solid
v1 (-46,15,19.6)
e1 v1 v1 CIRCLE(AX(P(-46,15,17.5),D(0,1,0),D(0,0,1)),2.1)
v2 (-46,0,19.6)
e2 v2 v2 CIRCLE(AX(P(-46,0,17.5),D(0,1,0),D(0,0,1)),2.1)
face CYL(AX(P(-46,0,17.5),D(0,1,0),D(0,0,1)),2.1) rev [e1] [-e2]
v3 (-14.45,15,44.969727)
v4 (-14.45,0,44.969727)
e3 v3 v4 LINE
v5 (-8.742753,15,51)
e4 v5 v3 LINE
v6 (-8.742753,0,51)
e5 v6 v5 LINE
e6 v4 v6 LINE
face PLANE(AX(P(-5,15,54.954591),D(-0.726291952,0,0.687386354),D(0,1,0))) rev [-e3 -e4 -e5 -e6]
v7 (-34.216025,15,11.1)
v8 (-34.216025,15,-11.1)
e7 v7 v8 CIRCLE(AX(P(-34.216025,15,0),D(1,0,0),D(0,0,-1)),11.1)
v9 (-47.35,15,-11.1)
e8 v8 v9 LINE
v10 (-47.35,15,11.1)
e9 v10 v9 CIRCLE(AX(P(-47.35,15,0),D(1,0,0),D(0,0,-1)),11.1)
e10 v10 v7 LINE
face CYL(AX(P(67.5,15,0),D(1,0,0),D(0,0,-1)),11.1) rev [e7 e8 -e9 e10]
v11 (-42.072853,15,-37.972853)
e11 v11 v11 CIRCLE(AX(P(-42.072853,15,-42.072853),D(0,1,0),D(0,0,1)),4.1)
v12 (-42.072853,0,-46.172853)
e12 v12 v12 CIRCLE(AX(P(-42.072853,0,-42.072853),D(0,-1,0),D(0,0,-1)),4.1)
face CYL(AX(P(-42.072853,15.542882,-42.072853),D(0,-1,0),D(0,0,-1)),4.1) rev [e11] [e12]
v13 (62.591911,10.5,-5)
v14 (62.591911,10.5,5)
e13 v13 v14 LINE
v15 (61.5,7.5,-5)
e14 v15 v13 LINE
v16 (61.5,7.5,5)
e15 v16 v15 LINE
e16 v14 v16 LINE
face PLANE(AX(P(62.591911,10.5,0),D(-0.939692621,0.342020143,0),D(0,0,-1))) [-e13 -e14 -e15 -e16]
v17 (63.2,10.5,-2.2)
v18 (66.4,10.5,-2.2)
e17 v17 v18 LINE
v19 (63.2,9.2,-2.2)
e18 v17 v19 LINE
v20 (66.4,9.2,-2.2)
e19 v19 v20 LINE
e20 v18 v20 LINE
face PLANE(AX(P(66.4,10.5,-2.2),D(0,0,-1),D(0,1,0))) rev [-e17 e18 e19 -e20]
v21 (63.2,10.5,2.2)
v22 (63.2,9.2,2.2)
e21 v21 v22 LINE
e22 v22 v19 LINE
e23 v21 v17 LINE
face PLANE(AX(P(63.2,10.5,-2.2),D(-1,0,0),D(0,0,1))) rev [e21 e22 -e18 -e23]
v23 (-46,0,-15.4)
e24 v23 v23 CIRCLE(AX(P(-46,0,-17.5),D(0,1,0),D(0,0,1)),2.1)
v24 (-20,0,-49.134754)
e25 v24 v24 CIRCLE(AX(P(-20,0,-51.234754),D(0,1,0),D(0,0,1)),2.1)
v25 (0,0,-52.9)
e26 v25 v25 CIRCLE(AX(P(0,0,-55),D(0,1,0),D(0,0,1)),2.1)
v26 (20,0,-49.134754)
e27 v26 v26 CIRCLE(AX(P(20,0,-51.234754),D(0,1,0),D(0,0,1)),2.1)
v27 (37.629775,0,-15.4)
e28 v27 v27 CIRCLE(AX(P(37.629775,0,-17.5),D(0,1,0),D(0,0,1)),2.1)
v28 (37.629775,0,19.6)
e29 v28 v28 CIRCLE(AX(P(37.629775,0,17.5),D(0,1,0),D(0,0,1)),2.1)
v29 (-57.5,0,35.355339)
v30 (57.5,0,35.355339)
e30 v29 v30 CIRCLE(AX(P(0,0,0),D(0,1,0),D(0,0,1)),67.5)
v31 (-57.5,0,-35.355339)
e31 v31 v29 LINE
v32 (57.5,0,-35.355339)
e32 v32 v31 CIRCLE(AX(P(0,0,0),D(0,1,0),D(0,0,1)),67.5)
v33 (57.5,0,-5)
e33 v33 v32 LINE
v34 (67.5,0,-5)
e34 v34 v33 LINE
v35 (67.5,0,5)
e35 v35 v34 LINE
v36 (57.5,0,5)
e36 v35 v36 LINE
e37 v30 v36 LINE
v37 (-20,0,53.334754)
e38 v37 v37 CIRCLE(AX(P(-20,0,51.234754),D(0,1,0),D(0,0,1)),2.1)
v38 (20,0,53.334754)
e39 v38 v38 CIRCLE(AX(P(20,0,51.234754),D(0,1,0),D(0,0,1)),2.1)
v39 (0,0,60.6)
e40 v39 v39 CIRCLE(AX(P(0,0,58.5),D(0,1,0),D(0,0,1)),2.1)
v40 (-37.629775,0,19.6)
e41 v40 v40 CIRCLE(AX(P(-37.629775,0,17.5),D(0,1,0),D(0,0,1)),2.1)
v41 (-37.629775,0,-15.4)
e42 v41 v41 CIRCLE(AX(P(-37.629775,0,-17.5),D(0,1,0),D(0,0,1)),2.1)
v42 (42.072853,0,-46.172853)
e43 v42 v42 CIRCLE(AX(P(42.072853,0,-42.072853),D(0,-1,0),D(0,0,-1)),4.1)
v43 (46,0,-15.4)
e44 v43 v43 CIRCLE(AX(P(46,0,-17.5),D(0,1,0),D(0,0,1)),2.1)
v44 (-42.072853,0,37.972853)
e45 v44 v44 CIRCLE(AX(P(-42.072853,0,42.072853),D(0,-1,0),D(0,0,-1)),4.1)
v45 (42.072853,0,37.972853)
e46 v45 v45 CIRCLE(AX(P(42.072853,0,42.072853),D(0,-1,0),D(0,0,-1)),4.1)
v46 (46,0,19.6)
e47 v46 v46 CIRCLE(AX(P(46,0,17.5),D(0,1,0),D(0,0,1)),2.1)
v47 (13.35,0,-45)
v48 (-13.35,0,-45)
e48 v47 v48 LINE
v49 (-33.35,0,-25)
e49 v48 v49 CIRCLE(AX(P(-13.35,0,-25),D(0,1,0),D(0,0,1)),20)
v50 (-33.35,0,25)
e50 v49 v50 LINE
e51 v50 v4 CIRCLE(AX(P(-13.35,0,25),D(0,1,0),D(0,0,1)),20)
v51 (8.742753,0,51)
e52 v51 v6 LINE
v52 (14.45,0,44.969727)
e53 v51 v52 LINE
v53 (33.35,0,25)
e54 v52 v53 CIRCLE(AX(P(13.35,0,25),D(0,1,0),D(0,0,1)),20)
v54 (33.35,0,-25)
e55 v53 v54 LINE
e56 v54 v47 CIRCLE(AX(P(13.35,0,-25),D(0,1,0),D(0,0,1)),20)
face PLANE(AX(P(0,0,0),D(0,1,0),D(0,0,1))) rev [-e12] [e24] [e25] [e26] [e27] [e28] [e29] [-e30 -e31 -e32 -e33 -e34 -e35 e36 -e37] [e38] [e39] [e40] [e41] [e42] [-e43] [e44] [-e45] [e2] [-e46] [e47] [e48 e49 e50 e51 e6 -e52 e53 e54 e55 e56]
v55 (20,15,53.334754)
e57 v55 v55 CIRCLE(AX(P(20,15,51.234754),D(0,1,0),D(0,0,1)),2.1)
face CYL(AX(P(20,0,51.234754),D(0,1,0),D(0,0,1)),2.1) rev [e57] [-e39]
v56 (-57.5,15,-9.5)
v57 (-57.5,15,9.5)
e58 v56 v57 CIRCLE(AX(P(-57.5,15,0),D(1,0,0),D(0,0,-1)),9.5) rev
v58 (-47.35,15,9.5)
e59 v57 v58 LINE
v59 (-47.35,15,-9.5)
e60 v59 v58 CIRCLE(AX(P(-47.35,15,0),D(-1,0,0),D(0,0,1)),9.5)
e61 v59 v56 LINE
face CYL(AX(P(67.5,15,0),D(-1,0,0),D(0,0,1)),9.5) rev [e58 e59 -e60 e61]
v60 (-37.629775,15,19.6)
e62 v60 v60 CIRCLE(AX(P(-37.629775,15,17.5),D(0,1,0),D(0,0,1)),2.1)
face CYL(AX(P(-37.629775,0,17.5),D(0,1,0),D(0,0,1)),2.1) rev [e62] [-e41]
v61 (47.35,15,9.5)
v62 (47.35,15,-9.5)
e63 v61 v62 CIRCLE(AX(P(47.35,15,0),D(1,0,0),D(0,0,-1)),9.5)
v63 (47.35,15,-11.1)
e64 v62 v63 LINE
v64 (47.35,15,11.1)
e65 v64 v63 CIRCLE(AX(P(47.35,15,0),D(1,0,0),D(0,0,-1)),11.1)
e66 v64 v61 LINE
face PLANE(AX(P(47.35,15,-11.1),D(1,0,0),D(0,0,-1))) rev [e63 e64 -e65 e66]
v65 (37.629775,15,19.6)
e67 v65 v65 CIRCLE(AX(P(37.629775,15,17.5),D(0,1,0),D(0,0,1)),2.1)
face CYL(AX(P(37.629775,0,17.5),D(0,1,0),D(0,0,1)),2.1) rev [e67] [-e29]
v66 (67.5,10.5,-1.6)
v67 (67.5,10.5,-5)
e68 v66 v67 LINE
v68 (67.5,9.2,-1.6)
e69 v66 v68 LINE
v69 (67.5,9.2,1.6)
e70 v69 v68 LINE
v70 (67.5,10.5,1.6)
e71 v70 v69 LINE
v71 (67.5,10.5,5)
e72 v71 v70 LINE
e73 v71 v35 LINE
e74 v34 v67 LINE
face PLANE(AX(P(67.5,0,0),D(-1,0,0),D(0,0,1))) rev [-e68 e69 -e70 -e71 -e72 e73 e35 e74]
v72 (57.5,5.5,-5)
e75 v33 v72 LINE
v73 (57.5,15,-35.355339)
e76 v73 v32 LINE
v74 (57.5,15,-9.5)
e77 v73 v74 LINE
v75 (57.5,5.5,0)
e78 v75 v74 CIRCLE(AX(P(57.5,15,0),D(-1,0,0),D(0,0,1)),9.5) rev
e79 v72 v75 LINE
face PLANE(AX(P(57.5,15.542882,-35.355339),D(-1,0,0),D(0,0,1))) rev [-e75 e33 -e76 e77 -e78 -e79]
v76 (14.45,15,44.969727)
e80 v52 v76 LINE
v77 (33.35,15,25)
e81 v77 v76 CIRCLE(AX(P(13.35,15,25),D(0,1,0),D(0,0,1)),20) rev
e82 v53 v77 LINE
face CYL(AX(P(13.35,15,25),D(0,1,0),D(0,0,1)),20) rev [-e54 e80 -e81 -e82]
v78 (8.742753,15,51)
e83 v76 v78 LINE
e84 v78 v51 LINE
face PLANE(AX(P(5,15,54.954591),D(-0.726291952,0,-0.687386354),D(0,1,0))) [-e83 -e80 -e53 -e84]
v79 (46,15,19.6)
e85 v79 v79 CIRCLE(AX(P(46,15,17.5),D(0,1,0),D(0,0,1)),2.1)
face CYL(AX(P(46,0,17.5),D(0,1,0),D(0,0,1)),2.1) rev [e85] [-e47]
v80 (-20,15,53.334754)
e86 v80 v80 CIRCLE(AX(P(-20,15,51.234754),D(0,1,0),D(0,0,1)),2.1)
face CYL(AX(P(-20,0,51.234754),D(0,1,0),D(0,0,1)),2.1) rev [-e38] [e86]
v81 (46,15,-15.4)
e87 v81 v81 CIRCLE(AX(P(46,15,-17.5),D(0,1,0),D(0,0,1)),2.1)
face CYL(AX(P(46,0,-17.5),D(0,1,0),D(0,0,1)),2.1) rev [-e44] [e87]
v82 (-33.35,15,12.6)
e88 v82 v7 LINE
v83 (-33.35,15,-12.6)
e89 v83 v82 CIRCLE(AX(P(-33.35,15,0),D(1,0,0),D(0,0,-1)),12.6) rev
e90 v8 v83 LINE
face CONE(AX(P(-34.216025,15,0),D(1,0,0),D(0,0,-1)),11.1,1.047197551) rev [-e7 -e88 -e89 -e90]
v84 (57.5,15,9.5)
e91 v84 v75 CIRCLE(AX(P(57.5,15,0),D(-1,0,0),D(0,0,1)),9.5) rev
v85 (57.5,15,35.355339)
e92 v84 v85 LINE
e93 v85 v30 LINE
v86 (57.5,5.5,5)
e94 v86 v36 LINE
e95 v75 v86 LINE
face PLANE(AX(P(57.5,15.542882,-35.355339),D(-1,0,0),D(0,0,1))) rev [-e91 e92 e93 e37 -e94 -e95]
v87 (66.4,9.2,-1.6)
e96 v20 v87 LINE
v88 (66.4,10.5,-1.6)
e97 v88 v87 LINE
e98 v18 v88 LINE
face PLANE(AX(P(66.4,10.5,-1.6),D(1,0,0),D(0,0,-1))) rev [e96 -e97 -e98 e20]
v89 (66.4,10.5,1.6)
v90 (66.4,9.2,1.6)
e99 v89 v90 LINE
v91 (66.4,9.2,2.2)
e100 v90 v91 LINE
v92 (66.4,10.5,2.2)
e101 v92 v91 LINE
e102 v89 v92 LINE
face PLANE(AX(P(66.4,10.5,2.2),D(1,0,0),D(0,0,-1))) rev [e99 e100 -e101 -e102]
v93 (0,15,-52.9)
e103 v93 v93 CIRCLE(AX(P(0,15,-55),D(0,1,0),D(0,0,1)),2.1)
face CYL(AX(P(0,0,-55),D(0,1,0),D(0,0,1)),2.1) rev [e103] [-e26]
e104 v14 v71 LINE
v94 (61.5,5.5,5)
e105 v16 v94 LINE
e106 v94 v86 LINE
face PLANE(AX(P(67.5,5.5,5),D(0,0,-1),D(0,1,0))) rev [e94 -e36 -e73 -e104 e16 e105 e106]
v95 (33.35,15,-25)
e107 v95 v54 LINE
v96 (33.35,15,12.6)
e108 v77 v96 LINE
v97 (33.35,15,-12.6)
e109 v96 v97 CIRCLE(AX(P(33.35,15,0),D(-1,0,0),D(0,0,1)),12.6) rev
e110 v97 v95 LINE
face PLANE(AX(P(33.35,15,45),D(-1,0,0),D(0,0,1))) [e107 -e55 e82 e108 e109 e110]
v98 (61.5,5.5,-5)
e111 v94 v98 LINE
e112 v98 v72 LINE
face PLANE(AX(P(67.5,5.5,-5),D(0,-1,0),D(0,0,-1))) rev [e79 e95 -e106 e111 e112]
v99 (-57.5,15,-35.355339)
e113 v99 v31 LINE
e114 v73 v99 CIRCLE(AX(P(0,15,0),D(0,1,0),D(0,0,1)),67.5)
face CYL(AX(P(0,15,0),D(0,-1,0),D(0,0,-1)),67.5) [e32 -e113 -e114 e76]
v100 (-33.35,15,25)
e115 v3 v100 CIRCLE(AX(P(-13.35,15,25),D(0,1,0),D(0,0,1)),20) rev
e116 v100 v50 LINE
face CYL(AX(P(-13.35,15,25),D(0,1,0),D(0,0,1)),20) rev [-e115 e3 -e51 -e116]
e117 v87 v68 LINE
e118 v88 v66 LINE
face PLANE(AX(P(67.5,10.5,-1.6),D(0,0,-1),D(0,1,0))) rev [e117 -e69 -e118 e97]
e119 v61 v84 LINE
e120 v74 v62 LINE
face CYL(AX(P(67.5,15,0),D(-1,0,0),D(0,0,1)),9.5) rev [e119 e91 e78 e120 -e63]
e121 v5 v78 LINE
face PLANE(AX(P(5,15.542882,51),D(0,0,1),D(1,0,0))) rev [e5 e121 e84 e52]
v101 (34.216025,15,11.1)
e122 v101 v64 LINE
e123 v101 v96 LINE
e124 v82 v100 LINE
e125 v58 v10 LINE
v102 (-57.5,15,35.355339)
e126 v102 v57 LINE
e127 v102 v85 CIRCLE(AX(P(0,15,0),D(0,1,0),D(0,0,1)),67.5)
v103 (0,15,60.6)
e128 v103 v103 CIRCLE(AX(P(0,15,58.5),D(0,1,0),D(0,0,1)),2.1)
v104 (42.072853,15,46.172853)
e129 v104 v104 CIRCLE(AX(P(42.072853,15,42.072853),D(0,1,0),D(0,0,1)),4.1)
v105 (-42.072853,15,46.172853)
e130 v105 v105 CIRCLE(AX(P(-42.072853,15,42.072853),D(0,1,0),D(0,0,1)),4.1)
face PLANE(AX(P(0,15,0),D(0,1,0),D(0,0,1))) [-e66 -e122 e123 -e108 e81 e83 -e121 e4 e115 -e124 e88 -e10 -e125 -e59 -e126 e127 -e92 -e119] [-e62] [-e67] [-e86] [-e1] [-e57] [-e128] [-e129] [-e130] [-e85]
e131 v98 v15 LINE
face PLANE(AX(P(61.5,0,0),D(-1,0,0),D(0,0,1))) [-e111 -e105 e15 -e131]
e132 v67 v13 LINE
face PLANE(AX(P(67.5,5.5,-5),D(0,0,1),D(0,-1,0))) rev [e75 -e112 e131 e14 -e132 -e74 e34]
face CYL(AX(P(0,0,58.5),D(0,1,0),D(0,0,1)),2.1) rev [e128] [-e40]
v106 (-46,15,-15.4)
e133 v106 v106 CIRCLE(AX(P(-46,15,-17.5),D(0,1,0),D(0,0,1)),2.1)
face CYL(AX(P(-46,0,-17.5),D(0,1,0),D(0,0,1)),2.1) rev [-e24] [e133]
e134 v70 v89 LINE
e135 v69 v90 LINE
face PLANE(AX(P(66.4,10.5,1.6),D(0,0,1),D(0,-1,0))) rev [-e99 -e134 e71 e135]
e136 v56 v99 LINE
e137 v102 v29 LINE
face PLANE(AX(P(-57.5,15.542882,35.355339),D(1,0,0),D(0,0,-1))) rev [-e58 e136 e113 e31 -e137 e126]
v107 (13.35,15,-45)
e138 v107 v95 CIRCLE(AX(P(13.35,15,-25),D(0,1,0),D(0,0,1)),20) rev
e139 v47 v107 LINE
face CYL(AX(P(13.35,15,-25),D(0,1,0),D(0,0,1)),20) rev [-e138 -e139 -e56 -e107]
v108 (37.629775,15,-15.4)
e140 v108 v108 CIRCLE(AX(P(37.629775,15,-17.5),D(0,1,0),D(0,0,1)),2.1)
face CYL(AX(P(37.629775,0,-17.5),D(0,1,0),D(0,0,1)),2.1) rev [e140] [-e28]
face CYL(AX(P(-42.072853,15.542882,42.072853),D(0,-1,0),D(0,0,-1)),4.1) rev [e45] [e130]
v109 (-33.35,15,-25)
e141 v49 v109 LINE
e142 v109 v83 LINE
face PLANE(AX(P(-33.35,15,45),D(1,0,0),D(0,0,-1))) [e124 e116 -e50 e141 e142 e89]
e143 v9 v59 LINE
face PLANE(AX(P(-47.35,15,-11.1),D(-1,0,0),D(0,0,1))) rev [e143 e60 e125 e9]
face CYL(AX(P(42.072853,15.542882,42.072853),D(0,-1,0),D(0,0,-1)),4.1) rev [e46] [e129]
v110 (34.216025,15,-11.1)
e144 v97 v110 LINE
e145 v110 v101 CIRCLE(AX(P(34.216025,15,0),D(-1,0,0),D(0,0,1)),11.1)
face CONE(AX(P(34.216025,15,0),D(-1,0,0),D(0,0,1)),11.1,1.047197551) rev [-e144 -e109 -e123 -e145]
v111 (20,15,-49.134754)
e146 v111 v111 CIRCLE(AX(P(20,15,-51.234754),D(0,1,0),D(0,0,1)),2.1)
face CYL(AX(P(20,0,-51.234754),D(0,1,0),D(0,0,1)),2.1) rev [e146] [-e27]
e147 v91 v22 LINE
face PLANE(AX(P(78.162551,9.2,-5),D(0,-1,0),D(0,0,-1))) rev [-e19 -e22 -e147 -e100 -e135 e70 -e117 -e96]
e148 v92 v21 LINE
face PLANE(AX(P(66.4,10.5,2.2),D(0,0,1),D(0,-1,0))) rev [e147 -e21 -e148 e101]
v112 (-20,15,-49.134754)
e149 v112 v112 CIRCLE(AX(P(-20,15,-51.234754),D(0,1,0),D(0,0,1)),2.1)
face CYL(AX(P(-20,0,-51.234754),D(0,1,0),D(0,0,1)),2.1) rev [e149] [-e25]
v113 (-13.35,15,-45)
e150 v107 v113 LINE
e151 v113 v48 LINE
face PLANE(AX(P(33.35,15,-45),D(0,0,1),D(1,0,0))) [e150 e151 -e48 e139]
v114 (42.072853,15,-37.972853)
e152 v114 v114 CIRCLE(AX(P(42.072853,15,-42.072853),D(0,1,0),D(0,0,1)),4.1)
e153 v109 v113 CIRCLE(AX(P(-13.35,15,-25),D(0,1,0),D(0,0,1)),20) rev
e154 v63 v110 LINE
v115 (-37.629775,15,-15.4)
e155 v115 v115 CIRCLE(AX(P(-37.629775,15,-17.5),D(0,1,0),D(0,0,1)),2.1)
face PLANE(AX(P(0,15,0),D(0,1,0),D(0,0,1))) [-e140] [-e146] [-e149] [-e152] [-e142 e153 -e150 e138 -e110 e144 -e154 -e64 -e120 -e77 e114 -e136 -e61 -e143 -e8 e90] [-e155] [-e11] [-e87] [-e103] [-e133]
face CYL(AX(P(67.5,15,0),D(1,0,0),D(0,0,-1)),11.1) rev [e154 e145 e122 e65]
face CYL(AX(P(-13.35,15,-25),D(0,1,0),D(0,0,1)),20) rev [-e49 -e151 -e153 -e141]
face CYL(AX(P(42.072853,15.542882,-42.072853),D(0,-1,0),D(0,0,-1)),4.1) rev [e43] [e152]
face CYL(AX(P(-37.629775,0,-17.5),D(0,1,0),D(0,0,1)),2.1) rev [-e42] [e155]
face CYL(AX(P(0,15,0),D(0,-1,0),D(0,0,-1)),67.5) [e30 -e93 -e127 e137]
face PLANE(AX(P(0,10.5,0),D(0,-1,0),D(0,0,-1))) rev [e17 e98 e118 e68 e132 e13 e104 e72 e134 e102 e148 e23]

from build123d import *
from OCP.BRepFilletAPI import BRepFilletAPI_MakeChamfer

# Parameters (mm, degrees)
SKETCH2_R               = 67.5
SKETCH2_W               = 66.7
SKETCH2_H               = 90
BOSS_EXTRUDE1_DEPTH     = 15
SKETCH7_W               = 14
SKETCH7_H               = 11.1
CUT_EXTRUDE1_DEPTH      = 135.058839694
CUT_EXTRUDE1_DEPTH_BACK = 135.058839694
SKETCH8_R               = 9.5
FILLET1_R               = 20
SKETCH9_R               = 2.1
CUT_EXTRUDE2_DEPTH      = 97.630740606
CHAMFER1_SIZE           = 1.5
CHAMFER1_SIZE2          = 0.866025404
SKETCH10_R              = 4.1
CUT_EXTRUDE3_DEPTH      = 97.630740606
CUT_EXTRUDE4_DEPTH      = 97.630740606
SKETCH12_W              = 10
SKETCH12_H              = 5.5
BOSS_EXTRUDE2_DEPTH     = 10
BOSS_EXTRUDE3_START     = 4
SKETCH14_W              = 10
SKETCH14_H              = 3.7
BOSS_EXTRUDE3_DEPTH     = 6
BOSS_EXTRUDE4_DEPTH     = 1.3
CHAMFER2_SIZE           = 3
CHAMFER2_SIZE2          = 1.091910703
SKETCH16_W              = 10
SKETCH16_H              = 6
CUT_EXTRUDE5_DEPTH      = 97.630740606
CHAMFER3_START          = -1
CHAMFER3_DEPTH          = 16
CUT_EXTRUDE6_DEPTH      = 97.630740606


with BuildPart() as part:
    # Sketch2 → Boss-Extrude1 (new body)
    with BuildSketch(Plane(origin=(0, 0, 0), x_dir=(1, 0, 0), z_dir=(0, 1, 0))):
        with Locations(Location((0, 0, 0), (0, 0, 270))):
            Circle(SKETCH2_R)
        Rectangle(SKETCH2_W, SKETCH2_H, mode=Mode.SUBTRACT)
    extrude(amount=BOSS_EXTRUDE1_DEPTH)

    # Sketch7 → Cut-Revolve2 (revolve, cut)
    with BuildSketch(Plane(origin=(0, 15, 0), x_dir=(1, 0, 0), z_dir=(0, 1, 0))):
        with Locations((-40.35, 5.55)):
            Rectangle(SKETCH7_W, SKETCH7_H)
        with Locations((40.35, 5.55)):
            Rectangle(SKETCH7_W, SKETCH7_H)
    revolve(axis=Axis((67.5, 15, 0), (-1, 0, 0)), mode=Mode.SUBTRACT)

    # Sketch8 → Cut-Extrude1 (cut, two sides: drawn at the far end of the back side and taken through both)
    with BuildSketch(Plane.ZY.offset(-47.35).offset(-CUT_EXTRUDE1_DEPTH_BACK)):
        with Locations((0, 15)):
            Circle(SKETCH8_R)
    extrude(amount=CUT_EXTRUDE1_DEPTH + CUT_EXTRUDE1_DEPTH_BACK, mode=Mode.SUBTRACT)

    # Fillet1
    fillet1_edges = [part.edges().sort_by_distance(p)[0] for p in [
        (-33.35, 7.5, -45),
        (-33.35, 7.5, 45),
        (33.35, 7.5, 45),
        (33.35, 7.5, -45),
    ]]
    fillet(fillet1_edges, radius=FILLET1_R)

    # Sketch9 → Cut-Extrude2 (cut, through all)
    with BuildSketch(Plane(origin=(0, 15, 0), x_dir=(1, 0, 0), z_dir=(0, 1, 0))):
        with Locations(Location((-37.629775444, 17.5, 0), (0, 0, 270))):
            Circle(SKETCH9_R)
        with Locations(Location((37.629775444, 17.5, 0), (0, 0, 270))):
            Circle(SKETCH9_R)
        with Locations(Location((37.629775444, -17.5, 0), (0, 0, 270))):
            Circle(SKETCH9_R)
        with Locations(Location((-37.629775444, -17.5, 0), (0, 0, 270))):
            Circle(SKETCH9_R)
        with Locations(Location((-20, 51.23475383, 0), (0, 0, 270))):
            Circle(SKETCH9_R)
        with Locations(Location((20, 51.23475383, 0), (0, 0, 270))):
            Circle(SKETCH9_R)
        with Locations(Location((20, -51.23475383, 0), (0, 0, 270))):
            Circle(SKETCH9_R)
        with Locations(Location((-20, -51.23475383, 0), (0, 0, 270))):
            Circle(SKETCH9_R)
        with Locations(Location((0, 55, 0), (0, 0, 270))):
            Circle(SKETCH9_R)
        with Locations(Location((0, -58.5, 0), (0, 0, 270))):
            Circle(SKETCH9_R)
        with Locations(Location((46, 17.5, 0), (0, 0, 270))):
            Circle(SKETCH9_R)
        with Locations(Location((46, -17.5, 0), (0, 0, 270))):
            Circle(SKETCH9_R)
        with Locations(Location((-46, 17.5, 0), (0, 0, 270))):
            Circle(SKETCH9_R)
        with Locations(Location((-46, -17.5, 0), (0, 0, 270))):
            Circle(SKETCH9_R)
    extrude(amount=-CUT_EXTRUDE2_DEPTH, mode=Mode.SUBTRACT)

    # Chamfer1: one chamfer whose edges measure the first distance from different faces: ONE call of the kernel's chamfer builder (chamfer() names one face for all edges)
    chamfer1_edges_1 = [part.edges().sort_by_distance(p)[0] for p in [
        (-33.35, 3.9, 0),
    ]]
    chamfer1_side_1 = [part.faces().sort_by_distance(p)[0] for p in [
        (-33.35, 0.522015325, 0),
    ]]
    chamfer1_edges_2 = [part.edges().sort_by_distance(p)[0] for p in [
        (33.35, 3.9, 0),
    ]]
    chamfer1_side_2 = [part.faces().sort_by_distance(p)[0] for p in [
        (33.35, 0.522015325, 0),
    ]]
    chamfer1 = BRepFilletAPI_MakeChamfer(part.part.solid().wrapped)
    for e in chamfer1_edges_1:
        chamfer1.Add(CHAMFER1_SIZE, CHAMFER1_SIZE2, e.wrapped, chamfer1_side_1[0].wrapped)  # the first distance lies on this face
    for e in chamfer1_edges_2:
        chamfer1.Add(CHAMFER1_SIZE, CHAMFER1_SIZE2, e.wrapped, chamfer1_side_2[0].wrapped)  # the first distance lies on this face
    add(Compound.cast(chamfer1.Shape()), mode=Mode.REPLACE)

    # Sketch10 → Cut-Extrude3 (cut, through all)
    with BuildSketch(Plane.XZ):
        with Locations(Location((42.072853481, -42.072853481, 0), (0, 0, 270))):
            Circle(SKETCH10_R)
        with Locations(Location((-42.072853481, -42.072853481, 0), (0, 0, 270))):
            Circle(SKETCH10_R)
        with Locations(Location((-42.072853481, 42.072853481, 0), (0, 0, 270))):
            Circle(SKETCH10_R)
        with Locations(Location((42.072853481, 42.072853481, 0), (0, 0, 270))):
            Circle(SKETCH10_R)
    extrude(amount=-CUT_EXTRUDE3_DEPTH, mode=Mode.SUBTRACT)

    # Sketch11 → Cut-Extrude4 (cut, through all)
    with BuildSketch(Plane.XZ):
        with BuildLine():
            Line((57.5, -35.355339059), (57.5, 35.355339059))
            ThreePointArc((57.5, 35.355339059), (67.5, 0), (57.5, -35.355339059))
        make_face()
    extrude(amount=-CUT_EXTRUDE4_DEPTH, mode=Mode.SUBTRACT)

    # Sketch12 → Boss-Extrude2 (add)
    with BuildSketch(Plane(origin=(57.5, 0, 0), x_dir=(0, 0, -1), z_dir=(1, 0, 0))):
        with Locations((0, 2.75)):
            Rectangle(SKETCH12_W, SKETCH12_H)
    extrude(amount=BOSS_EXTRUDE2_DEPTH)

    # Sketch14 → Boss-Extrude3 (add)
    with BuildSketch(Plane(origin=(57.5, 0, 0), x_dir=(0, 0, -1), z_dir=(1, 0, 0)).offset(BOSS_EXTRUDE3_START)):
        with Locations((0, 7.35)):
            Rectangle(SKETCH14_W, SKETCH14_H)
    extrude(amount=BOSS_EXTRUDE3_DEPTH)

    # Sketch15 → Boss-Extrude4 (add)
    with BuildSketch(Plane(origin=(0, 9.2, 0), x_dir=(1, 0, 0), z_dir=(0, 1, 0))):
        Polygon((66.4, -2.2), (66.4, -1.6), (67.5, -1.6), (67.5, -5), (61.5, -5), (61.5, 5), (67.5, 5), (67.5, 1.6), (66.4, 1.6), (66.4, 2.2), (63.2, 2.2), (63.2, -2.2), align=None)
    extrude(amount=BOSS_EXTRUDE4_DEPTH)

    # Chamfer2
    chamfer2_edges = [part.edges().sort_by_distance(p)[0] for p in [
        (61.5, 10.5, 0),
    ]]
    chamfer2_side = [part.faces().sort_by_distance(p)[0] for p in [
        (61.5, 8, 0),
    ]]
    chamfer(chamfer2_edges, length=CHAMFER2_SIZE, length2=CHAMFER2_SIZE2, reference=chamfer2_side[0])

    # Sketch16 → Cut-Extrude5 (cut, through all)
    with BuildSketch(Plane.XZ):
        with Locations((0, 48)):
            Rectangle(SKETCH16_W, SKETCH16_H)
    extrude(amount=-CUT_EXTRUDE5_DEPTH, mode=Mode.SUBTRACT)

    # Chamfer3: read off the stored shape, not the designer's step
    # Chamfer3 outline → Chamfer3 (cut)
    with BuildSketch(Plane(origin=(0, 0, 0), x_dir=(1, 0, 0), z_dir=(0, 1, 0)).offset(CHAMFER3_START)):
        with BuildLine():
            Line((-14.45, -44.969727089), (-8.74275335, -51))
            Line((-8.74275335, -51), (-5, -51))
            Line((-5, -51), (-5, -45))
            Line((-5, -45), (-13.35, -45))
            ThreePointArc((-13.35, -45), (-13.900208244, -44.99243034), (-14.45, -44.969727089))
        make_face()
        with BuildLine():
            Line((5, -45), (5, -51))
            Line((5, -51), (8.74275335, -51))
            Line((8.74275335, -51), (14.45, -44.969727089))
            ThreePointArc((14.45, -44.969727089), (13.900208244, -44.99243034), (13.35, -45))
            Line((13.35, -45), (5, -45))
        make_face()
    extrude(amount=CHAMFER3_DEPTH, mode=Mode.SUBTRACT)

    # Sketch18 → Cut-Extrude6 (cut, through all)
    with BuildSketch(Plane.XZ):
        with BuildLine():
            Line((-57.5, 35.355339059), (-57.5, -35.355339059))
            ThreePointArc((-57.5, -35.355339059), (-67.5, 0), (-57.5, 35.355339059))
        make_face()
    extrude(amount=-CUT_EXTRUDE6_DEPTH, mode=Mode.SUBTRACT)


solid = part.part
